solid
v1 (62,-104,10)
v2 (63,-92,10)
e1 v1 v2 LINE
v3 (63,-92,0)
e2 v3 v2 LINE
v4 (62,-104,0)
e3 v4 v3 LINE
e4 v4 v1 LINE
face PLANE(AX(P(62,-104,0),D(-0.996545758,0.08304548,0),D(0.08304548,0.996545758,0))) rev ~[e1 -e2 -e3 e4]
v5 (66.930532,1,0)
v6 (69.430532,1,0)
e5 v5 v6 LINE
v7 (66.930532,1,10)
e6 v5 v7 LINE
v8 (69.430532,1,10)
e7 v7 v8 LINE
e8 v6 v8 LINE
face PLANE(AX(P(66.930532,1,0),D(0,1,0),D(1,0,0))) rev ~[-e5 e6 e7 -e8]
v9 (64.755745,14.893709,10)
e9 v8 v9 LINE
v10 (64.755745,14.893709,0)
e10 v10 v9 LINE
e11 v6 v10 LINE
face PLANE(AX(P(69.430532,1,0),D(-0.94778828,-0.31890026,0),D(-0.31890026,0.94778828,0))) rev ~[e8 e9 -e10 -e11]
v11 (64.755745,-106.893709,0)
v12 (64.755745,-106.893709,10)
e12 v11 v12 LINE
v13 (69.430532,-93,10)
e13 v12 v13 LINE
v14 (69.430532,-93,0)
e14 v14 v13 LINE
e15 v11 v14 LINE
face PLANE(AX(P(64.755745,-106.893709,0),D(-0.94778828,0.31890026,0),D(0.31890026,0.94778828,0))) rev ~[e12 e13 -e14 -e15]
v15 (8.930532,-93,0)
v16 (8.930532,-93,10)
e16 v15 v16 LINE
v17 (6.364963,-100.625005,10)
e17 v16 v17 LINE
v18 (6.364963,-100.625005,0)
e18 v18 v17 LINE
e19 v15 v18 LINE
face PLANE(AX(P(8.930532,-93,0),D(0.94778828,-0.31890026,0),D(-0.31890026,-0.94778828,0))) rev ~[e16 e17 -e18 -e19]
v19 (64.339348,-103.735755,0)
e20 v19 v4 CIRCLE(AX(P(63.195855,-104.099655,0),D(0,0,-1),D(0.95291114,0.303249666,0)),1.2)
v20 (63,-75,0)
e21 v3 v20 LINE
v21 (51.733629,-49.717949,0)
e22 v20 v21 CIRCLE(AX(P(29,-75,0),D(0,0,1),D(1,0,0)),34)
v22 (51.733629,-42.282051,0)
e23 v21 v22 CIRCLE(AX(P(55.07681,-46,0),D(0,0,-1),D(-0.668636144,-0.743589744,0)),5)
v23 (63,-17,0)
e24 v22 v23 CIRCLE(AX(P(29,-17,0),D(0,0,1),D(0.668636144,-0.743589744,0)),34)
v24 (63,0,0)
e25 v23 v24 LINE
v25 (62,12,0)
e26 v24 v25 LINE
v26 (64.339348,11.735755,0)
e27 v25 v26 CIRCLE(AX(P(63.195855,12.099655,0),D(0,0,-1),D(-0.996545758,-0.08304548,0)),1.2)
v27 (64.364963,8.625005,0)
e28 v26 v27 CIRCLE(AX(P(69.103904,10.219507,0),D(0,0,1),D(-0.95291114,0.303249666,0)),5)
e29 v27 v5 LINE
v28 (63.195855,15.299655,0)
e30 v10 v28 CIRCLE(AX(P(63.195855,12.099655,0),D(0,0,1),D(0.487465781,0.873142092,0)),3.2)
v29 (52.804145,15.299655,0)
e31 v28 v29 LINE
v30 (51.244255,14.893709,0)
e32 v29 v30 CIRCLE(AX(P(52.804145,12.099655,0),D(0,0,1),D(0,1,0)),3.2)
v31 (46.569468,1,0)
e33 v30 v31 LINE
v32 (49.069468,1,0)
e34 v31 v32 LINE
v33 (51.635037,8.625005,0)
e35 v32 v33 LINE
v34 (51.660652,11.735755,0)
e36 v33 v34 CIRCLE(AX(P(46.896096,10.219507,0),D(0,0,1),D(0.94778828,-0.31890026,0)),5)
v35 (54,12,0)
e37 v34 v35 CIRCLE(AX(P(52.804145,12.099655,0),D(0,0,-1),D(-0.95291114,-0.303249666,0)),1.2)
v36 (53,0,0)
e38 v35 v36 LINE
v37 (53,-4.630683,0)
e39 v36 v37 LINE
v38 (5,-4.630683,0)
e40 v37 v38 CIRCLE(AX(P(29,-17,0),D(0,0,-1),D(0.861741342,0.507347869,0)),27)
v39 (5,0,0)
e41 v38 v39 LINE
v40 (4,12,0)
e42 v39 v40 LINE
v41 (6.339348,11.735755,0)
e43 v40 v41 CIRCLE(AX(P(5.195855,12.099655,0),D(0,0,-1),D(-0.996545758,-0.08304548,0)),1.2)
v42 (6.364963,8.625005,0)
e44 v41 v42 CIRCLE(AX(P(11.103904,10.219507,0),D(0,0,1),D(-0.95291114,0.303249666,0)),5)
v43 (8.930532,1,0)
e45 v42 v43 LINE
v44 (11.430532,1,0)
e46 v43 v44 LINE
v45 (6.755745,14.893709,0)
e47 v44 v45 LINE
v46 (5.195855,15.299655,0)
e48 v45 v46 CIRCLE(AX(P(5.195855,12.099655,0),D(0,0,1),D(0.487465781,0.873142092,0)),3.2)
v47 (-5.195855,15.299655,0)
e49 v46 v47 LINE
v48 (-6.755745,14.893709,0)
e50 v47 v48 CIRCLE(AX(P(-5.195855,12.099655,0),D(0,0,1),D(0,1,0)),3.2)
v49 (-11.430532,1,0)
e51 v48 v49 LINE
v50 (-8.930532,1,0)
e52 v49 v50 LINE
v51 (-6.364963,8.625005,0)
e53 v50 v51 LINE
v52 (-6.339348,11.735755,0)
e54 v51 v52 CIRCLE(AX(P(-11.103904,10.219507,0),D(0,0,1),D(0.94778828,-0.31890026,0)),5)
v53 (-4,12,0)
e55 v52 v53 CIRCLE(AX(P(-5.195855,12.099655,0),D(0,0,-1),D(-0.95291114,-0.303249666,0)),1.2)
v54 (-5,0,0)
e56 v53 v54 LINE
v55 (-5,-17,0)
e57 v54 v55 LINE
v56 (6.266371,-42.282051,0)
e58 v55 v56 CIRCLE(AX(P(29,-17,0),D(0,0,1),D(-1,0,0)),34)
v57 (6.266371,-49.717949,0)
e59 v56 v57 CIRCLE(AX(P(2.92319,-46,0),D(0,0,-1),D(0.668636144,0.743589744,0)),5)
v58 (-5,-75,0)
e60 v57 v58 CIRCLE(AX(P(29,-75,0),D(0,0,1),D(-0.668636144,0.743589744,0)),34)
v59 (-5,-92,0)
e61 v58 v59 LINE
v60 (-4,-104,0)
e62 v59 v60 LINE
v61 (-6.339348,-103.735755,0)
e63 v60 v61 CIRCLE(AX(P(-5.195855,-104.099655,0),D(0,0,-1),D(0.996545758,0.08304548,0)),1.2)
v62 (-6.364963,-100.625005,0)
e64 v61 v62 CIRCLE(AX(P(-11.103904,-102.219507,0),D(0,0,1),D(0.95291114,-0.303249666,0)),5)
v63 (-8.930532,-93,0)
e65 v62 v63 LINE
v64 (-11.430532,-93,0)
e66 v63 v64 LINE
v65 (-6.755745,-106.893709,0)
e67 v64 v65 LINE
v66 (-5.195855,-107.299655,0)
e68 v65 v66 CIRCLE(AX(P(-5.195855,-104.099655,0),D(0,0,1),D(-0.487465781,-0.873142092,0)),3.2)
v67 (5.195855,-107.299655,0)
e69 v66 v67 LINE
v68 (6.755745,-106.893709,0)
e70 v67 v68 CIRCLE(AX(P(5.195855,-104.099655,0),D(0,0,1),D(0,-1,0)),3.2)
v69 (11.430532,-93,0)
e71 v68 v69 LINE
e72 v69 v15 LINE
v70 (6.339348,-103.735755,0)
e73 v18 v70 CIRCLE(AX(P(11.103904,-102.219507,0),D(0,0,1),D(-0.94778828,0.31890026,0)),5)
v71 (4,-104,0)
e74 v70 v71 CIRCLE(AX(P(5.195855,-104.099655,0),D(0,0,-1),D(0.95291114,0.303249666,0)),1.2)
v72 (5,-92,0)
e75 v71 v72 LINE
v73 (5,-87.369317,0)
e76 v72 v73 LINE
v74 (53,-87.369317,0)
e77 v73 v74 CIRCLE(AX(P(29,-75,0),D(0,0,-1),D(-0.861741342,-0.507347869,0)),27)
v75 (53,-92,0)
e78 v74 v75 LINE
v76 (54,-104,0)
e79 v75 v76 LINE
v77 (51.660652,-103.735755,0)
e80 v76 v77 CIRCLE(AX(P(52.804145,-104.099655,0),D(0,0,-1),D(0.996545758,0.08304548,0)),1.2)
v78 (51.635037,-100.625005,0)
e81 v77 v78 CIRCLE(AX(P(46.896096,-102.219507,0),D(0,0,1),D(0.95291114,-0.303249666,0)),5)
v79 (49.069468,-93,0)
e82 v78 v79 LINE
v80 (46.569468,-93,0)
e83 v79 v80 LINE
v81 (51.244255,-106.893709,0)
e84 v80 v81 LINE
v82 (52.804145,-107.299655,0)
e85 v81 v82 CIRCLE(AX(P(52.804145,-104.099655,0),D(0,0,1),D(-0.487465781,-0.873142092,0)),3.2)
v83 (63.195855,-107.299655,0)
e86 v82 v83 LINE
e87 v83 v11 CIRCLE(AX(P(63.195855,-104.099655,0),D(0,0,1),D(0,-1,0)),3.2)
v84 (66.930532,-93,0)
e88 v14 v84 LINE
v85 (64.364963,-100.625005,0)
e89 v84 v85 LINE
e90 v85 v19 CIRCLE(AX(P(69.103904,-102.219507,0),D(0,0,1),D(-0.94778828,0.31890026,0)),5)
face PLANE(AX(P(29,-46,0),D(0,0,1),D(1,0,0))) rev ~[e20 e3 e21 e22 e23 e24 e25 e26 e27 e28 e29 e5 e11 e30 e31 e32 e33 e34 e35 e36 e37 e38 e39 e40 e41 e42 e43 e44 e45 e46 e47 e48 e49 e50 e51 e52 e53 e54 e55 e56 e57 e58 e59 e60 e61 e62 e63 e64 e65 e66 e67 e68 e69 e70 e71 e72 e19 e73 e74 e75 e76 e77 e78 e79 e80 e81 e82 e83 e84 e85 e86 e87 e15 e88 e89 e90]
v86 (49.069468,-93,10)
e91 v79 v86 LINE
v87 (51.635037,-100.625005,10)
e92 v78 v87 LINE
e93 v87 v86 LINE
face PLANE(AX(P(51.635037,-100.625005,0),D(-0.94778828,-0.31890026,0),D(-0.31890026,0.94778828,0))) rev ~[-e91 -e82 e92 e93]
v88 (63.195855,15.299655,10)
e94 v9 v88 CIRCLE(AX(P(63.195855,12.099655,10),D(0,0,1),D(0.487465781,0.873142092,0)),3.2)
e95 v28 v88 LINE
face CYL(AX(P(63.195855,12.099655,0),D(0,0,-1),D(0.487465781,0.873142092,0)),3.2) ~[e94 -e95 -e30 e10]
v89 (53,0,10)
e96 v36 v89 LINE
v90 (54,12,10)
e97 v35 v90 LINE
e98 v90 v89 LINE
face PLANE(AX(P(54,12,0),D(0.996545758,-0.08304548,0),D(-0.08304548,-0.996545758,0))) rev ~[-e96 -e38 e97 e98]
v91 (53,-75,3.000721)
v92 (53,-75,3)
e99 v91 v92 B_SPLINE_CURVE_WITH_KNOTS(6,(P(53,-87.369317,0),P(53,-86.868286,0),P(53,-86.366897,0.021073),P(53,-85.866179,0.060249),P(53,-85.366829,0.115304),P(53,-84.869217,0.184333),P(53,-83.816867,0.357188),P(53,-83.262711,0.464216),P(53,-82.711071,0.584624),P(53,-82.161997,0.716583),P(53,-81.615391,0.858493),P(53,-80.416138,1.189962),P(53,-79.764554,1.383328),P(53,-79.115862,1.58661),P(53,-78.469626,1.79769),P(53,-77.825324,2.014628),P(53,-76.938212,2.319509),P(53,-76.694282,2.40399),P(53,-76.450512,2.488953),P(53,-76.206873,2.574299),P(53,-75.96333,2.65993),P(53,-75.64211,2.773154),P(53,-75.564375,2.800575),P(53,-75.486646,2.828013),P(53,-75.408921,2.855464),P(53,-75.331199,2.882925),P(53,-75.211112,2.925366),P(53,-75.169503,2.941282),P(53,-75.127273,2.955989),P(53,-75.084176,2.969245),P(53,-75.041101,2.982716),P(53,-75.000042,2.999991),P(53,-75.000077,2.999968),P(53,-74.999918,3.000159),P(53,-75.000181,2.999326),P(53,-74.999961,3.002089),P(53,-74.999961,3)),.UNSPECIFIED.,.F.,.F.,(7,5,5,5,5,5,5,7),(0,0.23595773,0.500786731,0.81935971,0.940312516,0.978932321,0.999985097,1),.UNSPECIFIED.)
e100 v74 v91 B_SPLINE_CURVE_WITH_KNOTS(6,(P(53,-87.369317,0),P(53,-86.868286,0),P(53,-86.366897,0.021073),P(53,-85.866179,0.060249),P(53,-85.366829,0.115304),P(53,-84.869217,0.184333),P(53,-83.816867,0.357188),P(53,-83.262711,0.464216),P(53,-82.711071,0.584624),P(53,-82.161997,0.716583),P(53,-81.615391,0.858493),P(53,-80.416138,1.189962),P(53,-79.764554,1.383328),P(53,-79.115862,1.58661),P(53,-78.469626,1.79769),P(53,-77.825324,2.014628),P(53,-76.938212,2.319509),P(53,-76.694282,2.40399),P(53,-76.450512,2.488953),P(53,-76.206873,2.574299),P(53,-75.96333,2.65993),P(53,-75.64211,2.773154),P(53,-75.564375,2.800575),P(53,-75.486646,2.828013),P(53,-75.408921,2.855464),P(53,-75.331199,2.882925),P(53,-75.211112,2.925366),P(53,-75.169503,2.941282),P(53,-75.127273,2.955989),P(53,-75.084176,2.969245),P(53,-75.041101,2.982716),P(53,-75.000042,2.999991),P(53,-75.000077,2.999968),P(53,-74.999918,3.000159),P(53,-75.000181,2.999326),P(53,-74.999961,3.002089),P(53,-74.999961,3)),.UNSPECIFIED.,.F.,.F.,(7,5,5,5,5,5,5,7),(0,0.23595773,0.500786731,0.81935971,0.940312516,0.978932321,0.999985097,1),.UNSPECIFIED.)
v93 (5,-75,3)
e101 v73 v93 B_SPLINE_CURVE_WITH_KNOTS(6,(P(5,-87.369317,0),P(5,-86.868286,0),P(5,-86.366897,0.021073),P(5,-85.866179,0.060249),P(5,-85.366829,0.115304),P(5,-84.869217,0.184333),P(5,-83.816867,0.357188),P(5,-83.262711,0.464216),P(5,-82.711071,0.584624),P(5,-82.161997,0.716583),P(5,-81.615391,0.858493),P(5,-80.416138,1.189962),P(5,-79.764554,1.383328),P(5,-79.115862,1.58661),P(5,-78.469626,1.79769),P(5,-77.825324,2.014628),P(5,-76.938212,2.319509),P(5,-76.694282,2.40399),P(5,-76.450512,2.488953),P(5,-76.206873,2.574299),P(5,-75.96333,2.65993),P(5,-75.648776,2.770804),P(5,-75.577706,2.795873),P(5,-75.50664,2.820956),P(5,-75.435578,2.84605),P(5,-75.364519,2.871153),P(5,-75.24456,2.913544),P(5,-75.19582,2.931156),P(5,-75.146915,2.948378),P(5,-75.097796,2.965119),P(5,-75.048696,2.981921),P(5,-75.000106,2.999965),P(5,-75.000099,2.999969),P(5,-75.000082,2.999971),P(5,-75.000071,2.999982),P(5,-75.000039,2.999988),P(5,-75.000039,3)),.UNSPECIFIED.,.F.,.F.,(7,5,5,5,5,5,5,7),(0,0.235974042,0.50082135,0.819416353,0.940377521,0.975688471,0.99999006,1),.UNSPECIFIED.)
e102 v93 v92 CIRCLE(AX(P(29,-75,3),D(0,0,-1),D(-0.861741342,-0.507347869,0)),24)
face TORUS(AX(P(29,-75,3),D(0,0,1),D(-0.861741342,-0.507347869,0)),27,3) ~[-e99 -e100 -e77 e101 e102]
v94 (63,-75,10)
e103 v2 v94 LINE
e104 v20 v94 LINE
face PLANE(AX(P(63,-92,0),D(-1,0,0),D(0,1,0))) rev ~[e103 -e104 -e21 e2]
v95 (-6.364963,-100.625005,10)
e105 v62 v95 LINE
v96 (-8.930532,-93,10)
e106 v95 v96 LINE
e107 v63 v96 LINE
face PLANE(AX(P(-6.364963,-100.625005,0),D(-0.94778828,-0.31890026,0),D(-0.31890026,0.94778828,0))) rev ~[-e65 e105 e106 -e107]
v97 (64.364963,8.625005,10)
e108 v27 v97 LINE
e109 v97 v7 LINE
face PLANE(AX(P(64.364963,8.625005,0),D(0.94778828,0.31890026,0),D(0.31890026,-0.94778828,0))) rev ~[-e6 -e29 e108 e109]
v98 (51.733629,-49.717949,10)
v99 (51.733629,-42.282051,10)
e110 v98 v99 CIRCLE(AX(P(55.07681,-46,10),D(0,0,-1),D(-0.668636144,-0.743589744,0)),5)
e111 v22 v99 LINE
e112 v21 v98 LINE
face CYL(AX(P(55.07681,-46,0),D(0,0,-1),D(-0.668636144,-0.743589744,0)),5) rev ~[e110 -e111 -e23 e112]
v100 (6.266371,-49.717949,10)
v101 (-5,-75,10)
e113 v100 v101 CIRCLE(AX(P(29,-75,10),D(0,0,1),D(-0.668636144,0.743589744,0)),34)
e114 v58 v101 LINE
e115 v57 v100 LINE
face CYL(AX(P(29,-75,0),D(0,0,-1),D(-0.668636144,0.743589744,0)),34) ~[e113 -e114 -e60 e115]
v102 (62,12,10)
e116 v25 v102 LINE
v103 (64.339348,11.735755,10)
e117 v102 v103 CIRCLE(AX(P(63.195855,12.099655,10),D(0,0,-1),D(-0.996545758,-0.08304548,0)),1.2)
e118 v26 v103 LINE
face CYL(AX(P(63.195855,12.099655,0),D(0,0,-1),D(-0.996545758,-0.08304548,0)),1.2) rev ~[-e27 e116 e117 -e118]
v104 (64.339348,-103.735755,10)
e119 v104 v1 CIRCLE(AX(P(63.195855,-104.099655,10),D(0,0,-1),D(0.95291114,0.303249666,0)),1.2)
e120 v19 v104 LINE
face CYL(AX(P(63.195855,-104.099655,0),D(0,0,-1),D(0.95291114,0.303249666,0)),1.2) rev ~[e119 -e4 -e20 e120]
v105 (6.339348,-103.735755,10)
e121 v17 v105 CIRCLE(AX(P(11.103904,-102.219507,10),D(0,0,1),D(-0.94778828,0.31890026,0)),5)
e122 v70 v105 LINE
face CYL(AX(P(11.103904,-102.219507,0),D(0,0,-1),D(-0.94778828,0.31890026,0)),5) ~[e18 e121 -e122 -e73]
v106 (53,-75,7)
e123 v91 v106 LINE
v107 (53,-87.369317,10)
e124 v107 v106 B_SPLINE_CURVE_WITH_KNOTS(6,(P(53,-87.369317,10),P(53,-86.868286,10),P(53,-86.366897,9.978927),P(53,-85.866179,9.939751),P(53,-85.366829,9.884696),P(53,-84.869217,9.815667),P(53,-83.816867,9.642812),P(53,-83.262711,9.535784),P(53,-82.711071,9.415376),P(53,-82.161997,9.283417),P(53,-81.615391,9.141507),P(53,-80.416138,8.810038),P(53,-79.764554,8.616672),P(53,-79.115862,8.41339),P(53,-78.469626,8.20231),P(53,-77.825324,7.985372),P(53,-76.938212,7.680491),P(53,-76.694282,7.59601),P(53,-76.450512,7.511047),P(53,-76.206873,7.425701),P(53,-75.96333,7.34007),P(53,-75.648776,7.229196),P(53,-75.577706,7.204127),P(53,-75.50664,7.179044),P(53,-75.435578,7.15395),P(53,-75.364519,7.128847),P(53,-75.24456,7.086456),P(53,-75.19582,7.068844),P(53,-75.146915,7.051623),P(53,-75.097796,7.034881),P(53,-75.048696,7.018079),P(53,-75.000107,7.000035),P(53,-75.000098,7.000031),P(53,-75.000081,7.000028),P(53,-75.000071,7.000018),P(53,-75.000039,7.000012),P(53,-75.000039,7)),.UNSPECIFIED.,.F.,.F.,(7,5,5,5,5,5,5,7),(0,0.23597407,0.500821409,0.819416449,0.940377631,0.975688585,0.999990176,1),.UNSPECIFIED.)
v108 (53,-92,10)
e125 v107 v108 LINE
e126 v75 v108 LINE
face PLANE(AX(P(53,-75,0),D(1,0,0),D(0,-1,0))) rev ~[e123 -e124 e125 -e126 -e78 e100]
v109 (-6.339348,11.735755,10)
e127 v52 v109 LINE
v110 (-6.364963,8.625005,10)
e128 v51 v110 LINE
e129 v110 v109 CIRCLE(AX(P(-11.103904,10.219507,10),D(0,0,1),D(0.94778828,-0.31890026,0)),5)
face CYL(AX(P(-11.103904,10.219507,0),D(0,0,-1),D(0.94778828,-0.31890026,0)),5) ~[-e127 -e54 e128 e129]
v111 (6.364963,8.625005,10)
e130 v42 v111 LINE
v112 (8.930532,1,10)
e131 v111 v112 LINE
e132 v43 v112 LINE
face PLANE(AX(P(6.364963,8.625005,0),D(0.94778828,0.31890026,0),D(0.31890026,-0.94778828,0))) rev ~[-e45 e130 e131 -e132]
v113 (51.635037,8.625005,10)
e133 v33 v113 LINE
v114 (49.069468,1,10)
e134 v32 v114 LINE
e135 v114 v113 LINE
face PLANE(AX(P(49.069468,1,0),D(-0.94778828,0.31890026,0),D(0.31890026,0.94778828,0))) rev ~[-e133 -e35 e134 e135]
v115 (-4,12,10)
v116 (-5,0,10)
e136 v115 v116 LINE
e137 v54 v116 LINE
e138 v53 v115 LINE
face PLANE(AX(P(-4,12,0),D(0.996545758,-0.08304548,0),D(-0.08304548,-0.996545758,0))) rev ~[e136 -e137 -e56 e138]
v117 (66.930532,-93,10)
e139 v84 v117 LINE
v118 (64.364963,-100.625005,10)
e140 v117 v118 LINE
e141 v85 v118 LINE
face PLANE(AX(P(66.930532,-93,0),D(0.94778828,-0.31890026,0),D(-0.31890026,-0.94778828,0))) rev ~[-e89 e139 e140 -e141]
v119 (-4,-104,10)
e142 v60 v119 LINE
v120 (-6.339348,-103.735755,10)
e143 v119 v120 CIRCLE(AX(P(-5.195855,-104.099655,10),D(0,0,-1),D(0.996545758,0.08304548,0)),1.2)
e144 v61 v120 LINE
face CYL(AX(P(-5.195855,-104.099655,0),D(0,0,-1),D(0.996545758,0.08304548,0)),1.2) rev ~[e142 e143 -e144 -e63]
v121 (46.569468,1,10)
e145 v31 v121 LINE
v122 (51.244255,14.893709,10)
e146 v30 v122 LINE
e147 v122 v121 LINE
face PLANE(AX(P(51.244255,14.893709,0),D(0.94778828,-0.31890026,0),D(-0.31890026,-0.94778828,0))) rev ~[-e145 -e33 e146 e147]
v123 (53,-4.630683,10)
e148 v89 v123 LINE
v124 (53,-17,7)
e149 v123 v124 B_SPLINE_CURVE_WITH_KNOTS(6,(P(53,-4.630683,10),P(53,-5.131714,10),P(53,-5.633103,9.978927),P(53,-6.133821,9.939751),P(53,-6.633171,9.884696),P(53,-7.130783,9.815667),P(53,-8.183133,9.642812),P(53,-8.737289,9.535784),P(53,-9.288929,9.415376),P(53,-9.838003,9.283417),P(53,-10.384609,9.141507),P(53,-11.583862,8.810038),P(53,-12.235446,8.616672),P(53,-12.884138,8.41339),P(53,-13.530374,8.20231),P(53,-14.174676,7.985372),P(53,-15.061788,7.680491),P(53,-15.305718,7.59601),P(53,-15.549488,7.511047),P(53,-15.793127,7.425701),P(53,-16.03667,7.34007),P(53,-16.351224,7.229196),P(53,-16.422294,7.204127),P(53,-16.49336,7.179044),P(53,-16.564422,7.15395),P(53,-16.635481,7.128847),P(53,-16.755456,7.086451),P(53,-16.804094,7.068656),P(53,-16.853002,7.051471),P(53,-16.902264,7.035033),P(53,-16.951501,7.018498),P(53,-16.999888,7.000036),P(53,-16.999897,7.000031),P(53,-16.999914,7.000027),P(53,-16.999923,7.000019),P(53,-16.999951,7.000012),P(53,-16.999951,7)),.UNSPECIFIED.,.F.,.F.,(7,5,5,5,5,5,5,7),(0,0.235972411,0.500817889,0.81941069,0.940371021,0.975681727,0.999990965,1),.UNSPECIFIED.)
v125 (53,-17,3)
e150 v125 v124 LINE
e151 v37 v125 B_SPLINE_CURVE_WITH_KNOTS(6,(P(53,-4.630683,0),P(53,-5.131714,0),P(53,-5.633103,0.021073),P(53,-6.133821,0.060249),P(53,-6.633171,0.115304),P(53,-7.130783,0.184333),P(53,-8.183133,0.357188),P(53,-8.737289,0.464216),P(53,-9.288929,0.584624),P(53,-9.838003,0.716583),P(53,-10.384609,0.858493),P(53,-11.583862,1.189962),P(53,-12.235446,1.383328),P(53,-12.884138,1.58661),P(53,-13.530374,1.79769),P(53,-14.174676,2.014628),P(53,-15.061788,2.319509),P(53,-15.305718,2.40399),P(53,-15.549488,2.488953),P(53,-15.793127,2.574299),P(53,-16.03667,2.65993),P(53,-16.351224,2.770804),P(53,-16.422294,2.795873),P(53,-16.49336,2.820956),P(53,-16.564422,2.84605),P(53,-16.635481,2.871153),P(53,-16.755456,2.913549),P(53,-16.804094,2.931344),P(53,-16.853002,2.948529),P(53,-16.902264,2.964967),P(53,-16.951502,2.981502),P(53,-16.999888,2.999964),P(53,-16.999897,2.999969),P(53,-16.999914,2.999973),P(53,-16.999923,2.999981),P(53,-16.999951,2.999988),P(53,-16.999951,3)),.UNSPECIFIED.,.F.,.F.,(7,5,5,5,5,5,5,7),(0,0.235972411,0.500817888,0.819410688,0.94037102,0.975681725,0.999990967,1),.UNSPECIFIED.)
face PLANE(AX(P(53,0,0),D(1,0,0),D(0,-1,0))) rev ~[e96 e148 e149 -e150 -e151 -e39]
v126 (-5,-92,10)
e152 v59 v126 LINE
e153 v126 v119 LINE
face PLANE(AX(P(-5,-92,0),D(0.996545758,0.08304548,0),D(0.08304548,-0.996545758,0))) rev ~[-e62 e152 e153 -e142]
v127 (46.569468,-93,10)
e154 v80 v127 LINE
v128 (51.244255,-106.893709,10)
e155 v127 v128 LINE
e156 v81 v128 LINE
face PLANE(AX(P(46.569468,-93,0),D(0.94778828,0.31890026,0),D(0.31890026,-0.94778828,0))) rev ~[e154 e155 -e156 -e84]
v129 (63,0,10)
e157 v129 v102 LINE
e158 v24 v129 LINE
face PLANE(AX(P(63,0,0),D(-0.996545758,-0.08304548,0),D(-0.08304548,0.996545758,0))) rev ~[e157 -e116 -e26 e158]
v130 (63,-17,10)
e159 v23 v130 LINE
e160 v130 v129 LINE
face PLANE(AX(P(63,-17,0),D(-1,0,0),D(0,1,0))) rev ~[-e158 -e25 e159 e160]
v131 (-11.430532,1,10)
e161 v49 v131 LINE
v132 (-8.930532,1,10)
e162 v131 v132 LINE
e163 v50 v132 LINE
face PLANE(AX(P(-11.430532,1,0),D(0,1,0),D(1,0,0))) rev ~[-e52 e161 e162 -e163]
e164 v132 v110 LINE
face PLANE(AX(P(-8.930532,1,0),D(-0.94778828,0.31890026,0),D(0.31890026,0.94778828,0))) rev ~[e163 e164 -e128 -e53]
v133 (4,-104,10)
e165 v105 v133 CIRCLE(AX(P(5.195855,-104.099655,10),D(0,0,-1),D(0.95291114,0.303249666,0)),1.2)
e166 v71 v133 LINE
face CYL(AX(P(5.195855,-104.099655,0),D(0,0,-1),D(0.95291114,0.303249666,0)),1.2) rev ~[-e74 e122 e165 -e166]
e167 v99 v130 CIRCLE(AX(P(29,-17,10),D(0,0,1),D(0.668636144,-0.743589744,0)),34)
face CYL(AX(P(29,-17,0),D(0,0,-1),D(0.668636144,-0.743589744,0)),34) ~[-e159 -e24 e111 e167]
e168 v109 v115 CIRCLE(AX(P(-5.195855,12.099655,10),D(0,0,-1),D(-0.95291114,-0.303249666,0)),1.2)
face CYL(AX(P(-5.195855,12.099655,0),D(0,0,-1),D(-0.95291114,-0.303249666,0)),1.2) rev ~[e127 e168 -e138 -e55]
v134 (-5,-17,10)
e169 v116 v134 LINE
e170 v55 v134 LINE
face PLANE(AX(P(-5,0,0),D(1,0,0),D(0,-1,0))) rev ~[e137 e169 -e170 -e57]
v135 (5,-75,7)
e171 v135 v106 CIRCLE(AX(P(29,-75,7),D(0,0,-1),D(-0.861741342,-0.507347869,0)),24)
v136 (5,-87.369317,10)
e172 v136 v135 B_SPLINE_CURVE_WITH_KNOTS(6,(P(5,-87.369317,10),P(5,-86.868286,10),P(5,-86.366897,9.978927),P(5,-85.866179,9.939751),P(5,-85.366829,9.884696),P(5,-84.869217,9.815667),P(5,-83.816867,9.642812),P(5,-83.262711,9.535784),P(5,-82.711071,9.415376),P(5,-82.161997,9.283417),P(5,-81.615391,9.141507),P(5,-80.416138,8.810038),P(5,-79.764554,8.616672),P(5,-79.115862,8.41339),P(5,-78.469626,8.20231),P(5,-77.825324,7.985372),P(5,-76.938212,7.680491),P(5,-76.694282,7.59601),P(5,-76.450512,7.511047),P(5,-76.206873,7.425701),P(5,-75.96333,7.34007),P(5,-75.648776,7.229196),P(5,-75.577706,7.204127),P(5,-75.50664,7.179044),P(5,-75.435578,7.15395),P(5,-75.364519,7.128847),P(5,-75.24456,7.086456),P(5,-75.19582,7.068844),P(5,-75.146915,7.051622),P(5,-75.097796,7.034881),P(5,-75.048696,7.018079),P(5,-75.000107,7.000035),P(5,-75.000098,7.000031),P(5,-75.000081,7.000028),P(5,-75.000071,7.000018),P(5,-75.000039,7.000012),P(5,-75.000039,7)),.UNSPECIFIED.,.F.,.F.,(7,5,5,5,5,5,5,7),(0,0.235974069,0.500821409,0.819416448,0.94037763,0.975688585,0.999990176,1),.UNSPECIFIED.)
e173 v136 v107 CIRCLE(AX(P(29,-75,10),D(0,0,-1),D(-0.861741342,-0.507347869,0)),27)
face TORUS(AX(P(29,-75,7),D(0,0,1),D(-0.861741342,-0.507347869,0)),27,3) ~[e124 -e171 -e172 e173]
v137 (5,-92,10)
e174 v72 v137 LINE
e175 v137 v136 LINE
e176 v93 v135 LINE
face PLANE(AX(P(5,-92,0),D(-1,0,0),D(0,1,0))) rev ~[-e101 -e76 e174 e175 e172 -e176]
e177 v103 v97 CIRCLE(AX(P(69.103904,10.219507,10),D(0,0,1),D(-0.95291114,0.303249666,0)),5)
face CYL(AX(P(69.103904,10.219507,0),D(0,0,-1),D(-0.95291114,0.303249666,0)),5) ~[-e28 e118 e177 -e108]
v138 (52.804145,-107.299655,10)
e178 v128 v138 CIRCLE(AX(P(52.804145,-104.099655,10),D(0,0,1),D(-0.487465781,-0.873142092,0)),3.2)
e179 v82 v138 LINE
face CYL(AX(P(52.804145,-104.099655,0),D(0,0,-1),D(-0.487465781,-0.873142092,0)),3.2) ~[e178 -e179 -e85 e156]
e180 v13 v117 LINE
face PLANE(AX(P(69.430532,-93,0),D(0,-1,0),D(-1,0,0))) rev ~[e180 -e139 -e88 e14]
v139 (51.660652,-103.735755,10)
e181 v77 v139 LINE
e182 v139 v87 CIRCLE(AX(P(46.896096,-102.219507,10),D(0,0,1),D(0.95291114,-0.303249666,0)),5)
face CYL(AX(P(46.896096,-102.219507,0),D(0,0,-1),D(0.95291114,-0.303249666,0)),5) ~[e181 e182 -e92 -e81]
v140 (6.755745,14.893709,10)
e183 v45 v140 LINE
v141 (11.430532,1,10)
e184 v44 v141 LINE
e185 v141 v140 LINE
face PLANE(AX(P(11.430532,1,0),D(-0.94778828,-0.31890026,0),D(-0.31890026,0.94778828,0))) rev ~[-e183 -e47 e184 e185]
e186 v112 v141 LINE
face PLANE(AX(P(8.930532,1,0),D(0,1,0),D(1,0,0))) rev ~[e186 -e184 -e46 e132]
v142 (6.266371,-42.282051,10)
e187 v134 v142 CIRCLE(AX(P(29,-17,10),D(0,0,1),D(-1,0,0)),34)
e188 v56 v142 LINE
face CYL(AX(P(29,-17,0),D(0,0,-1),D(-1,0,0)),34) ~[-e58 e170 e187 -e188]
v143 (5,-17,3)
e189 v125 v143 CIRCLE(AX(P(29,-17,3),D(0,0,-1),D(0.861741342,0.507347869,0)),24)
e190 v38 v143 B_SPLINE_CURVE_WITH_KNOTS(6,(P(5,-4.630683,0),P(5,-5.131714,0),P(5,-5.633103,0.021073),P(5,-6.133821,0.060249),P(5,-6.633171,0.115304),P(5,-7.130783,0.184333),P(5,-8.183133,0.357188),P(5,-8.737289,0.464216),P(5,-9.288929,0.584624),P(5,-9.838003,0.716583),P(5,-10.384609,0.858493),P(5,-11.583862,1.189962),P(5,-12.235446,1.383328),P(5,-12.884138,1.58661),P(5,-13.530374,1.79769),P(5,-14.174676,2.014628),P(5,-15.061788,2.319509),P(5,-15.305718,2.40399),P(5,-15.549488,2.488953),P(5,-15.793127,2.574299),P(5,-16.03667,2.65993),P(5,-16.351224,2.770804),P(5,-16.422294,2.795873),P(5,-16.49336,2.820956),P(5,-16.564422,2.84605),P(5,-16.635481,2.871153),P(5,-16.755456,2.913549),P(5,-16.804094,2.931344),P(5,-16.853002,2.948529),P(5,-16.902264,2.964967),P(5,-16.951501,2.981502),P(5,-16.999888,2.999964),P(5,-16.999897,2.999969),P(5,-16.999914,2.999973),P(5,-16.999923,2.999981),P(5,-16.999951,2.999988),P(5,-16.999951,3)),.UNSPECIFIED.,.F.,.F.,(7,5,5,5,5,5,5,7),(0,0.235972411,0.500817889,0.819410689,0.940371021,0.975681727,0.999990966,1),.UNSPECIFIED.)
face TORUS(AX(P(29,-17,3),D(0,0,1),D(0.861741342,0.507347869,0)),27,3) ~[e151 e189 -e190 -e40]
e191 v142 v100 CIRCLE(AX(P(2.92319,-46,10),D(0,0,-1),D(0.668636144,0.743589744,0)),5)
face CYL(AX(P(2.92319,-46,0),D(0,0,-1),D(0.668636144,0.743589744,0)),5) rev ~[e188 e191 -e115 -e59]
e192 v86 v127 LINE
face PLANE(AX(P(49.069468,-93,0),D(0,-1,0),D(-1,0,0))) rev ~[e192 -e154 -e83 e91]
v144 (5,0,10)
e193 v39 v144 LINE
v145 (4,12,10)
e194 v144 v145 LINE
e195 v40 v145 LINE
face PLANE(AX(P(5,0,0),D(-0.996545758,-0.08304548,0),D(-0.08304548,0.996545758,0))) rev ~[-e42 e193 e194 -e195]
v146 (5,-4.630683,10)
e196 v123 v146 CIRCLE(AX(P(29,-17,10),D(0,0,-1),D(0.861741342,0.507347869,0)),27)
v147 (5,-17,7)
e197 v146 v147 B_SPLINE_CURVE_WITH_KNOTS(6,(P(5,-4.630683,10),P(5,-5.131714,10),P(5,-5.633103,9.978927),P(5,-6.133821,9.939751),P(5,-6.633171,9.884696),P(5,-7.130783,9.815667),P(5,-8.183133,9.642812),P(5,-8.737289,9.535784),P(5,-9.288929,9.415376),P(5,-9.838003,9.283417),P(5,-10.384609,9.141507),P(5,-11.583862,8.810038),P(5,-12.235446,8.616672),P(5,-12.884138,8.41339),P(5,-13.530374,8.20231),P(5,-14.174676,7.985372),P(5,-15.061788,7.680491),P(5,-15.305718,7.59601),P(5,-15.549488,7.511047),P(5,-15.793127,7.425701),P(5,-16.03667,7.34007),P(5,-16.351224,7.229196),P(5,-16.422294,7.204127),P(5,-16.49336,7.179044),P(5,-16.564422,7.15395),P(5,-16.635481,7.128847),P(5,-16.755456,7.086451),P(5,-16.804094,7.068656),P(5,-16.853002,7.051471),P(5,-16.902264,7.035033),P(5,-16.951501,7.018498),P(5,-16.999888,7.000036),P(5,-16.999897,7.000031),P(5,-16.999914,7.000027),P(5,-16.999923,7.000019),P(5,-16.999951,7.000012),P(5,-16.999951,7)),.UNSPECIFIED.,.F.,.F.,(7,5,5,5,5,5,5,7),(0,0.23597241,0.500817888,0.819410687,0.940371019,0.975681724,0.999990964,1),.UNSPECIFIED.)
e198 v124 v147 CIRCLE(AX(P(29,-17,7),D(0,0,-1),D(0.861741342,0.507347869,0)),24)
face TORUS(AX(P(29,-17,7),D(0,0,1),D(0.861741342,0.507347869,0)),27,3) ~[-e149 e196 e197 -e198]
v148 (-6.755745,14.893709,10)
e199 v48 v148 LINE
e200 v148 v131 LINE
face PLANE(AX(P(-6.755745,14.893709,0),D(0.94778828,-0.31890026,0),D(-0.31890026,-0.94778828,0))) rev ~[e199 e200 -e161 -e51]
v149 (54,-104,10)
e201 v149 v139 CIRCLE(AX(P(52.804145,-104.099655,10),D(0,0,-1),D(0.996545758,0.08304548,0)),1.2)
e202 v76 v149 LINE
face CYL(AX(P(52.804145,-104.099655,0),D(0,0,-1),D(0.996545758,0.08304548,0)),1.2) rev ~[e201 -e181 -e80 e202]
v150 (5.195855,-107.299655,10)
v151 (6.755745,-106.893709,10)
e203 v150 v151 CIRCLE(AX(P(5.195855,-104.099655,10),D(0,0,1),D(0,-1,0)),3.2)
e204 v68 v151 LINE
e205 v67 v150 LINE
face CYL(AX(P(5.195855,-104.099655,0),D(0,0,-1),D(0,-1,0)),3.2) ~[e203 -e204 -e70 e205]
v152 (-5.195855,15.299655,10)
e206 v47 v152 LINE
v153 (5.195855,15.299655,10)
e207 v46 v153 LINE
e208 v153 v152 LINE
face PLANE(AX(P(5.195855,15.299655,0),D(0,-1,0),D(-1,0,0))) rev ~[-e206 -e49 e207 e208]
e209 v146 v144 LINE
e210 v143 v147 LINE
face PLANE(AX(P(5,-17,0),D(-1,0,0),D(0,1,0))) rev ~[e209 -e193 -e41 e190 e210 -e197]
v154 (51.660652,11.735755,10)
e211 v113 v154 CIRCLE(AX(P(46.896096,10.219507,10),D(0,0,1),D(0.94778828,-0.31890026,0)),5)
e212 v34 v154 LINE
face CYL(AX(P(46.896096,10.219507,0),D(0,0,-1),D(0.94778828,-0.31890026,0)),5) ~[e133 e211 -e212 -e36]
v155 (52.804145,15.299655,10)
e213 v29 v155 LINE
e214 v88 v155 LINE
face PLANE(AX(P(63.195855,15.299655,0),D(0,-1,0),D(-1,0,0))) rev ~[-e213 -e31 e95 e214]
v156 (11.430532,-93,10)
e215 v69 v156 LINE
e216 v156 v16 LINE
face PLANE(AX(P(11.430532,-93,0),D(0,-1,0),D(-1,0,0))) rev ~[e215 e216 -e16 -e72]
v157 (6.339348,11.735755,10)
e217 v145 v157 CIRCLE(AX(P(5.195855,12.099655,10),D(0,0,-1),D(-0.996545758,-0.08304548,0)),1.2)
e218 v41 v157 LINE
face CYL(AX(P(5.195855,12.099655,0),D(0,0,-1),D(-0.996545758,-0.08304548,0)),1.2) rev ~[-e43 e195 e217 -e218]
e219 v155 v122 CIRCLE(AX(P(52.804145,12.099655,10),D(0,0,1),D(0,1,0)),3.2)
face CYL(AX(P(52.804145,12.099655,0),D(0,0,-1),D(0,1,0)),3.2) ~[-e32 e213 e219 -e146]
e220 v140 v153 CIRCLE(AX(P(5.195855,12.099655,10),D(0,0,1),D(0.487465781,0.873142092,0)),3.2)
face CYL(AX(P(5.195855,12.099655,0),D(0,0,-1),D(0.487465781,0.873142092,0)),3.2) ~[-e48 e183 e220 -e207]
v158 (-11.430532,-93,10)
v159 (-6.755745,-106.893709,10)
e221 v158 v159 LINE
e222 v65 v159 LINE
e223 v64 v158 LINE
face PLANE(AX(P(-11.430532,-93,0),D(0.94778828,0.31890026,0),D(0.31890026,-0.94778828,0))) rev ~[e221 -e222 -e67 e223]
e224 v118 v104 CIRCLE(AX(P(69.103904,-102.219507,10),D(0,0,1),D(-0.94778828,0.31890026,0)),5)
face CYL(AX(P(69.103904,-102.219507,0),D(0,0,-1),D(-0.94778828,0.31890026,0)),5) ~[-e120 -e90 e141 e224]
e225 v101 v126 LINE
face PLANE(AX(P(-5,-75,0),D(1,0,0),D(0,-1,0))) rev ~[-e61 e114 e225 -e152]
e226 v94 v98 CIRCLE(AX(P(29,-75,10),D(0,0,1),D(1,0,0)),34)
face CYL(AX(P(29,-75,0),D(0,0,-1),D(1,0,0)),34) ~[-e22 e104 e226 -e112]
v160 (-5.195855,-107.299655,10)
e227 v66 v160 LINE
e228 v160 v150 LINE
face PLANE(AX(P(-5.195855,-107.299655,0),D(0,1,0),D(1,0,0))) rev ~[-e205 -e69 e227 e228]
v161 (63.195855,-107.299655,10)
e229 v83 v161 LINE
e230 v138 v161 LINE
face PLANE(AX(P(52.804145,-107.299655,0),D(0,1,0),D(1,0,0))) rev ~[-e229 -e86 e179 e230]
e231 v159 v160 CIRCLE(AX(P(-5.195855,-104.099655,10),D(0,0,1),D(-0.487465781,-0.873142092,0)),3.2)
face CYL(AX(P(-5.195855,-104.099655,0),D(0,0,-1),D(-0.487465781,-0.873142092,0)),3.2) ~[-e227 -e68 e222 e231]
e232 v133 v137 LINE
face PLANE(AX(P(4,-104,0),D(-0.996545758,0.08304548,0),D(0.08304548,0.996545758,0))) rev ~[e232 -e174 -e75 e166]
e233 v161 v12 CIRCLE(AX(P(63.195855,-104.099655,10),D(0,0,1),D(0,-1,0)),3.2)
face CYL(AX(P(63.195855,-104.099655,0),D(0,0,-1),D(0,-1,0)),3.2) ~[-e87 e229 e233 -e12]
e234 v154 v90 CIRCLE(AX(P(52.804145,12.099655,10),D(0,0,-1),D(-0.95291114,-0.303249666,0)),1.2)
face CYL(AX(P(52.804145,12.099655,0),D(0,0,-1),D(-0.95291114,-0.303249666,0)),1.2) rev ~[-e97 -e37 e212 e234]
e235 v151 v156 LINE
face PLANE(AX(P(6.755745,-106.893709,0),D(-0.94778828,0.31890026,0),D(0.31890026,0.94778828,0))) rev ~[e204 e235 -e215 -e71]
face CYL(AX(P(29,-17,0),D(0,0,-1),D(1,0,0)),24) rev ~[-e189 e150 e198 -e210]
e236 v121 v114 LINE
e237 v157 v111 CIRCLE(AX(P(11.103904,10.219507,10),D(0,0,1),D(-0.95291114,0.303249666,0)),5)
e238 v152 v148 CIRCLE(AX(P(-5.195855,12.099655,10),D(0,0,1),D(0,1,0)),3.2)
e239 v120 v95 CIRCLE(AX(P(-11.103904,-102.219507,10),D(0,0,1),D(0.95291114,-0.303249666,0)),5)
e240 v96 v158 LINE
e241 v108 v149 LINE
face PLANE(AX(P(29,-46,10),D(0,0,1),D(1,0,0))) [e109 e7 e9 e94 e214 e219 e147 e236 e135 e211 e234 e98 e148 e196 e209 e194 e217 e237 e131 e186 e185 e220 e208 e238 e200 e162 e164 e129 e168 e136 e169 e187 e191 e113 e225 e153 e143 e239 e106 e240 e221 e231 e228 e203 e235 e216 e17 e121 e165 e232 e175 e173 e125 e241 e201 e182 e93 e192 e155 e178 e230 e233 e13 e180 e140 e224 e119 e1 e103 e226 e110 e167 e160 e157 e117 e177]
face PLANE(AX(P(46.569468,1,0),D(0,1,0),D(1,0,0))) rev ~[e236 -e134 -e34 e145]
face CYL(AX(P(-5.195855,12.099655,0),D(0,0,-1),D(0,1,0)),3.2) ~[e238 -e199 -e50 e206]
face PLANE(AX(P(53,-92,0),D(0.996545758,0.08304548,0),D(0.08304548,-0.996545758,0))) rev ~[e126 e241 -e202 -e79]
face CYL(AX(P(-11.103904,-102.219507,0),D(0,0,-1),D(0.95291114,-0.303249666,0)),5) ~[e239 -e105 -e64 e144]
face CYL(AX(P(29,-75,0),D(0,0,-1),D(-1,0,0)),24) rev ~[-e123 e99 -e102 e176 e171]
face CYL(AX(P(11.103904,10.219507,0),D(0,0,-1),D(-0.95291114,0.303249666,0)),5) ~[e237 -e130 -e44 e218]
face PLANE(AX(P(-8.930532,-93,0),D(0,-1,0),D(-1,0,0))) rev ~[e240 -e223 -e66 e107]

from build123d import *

# Parameters (mm, degrees)
F1_DEPTH    = 10
F2_T2_ANGLE = 240.9746670828
F2_T4_ANGLE = 240.9746670828
F2_T6_ANGLE = 240.9746670828
F2_T8_ANGLE = 240.9746670828


# Not quite as in the source:
# - a fillet or chamfer that OpenCascade refuses, or shapes differently, is made with other operations: its cross-section is extruded or revolved along the edge and cut away or added


with BuildPart() as f1:
    # F0 (on Top) → F1 (new body)
    with BuildSketch(Plane.XY):
        with BuildLine():
            ThreePointArc((6.3393482774, 11.7357549763), (6.1040734685, 10.1783374237), (6.3649625736, 8.6250053459))
            Line((6.3649625736, 8.6250053459), (8.9305315263, 1))
            Line((8.9305315263, 1), (11.4305315263, 1))
            Line((11.4305315263, 1), (6.7557454084, 14.8937092698))
            ThreePointArc((6.7557454084, 14.8937092698), (6.001778287, 15.1965058009), (5.1958549099, 15.2996545758))
            Line((5.1958549099, 15.2996545758), (0, 15.2996545758))
            Line((0, 15.2996545758), (-5.1958549099, 15.2996545758))
            ThreePointArc((-5.1958549099, 15.2996545758), (-6.001778287, 15.1965058009), (-6.7557454084, 14.8937092698))
            Line((-6.7557454084, 14.8937092698), (-11.4305315263, 1))
            Line((-11.4305315263, 1), (-8.9305315263, 1))
            Line((-8.9305315263, 1), (-6.3649625736, 8.6250053459))
            ThreePointArc((-6.3649625736, 8.6250053459), (-6.1040734685, 10.1783374237), (-6.3393482774, 11.7357549763))
            ThreePointArc((-6.3393482774, 11.7357549763), (-5.3305463755, 13.2920715369), (-4, 12))
            Line((-4, 12), (-5, 0))
            Line((-5, 0), (-5, -17))
            ThreePointArc((-5, -17), (-2.0559445405, -30.8393753001), (6.2663710998, -42.2820512821))
            ThreePointArc((6.2663710998, -42.2820512821), (7.9231903792, -46), (6.2663710998, -49.7179487179))
            ThreePointArc((6.2663710998, -49.7179487179), (-2.0559445405, -61.1606246999), (-5, -75))
            Line((-5, -75), (-5, -92))
            Line((-5, -92), (-4, -104))
            ThreePointArc((-4, -104), (-5.3305463755, -105.2920715369), (-6.3393482774, -103.7357549763))
            ThreePointArc((-6.3393482774, -103.7357549763), (-6.1040734685, -102.1783374237), (-6.3649625736, -100.6250053459))
            Line((-6.3649625736, -100.6250053459), (-8.9305315263, -93))
            Line((-8.9305315263, -93), (-11.4305315263, -93))
            Line((-11.4305315263, -93), (-6.7557454084, -106.8937092698))
            ThreePointArc((-6.7557454084, -106.8937092698), (-6.001778287, -107.1965058009), (-5.1958549099, -107.2996545758))
            Line((-5.1958549099, -107.2996545758), (0, -107.2996545758))
            Line((0, -107.2996545758), (5.1958549099, -107.2996545758))
            ThreePointArc((5.1958549099, -107.2996545758), (6.001778287, -107.1965058009), (6.7557454084, -106.8937092698))
            Line((6.7557454084, -106.8937092698), (11.4305315263, -93))
            Line((11.4305315263, -93), (8.9305315263, -93))
            Line((8.9305315263, -93), (6.3649625736, -100.6250053459))
            ThreePointArc((6.3649625736, -100.6250053459), (6.1040734685, -102.1783374237), (6.3393482774, -103.7357549763))
            ThreePointArc((6.3393482774, -103.7357549763), (5.3305463755, -105.2920715369), (4, -104))
            Line((4, -104), (5, -92))
            Line((5, -92), (5, -75))
            ThreePointArc((5, -75), (29, -51), (53, -75))
            Line((53, -75), (53, -92))
            Line((53, -92), (54, -104))
            ThreePointArc((54, -104), (52.6694536245, -105.2920715369), (51.6606517226, -103.7357549763))
            ThreePointArc((51.6606517226, -103.7357549763), (51.8959265315, -102.1783374237), (51.6350374264, -100.6250053459))
            Line((51.6350374264, -100.6250053459), (49.0694684737, -93))
            Line((49.0694684737, -93), (46.5694684737, -93))
            Line((46.5694684737, -93), (51.2442545916, -106.8937092698))
            ThreePointArc((51.2442545916, -106.8937092698), (51.998221713, -107.1965058009), (52.8041450901, -107.2996545758))
            Line((52.8041450901, -107.2996545758), (58, -107.2996545758))
            Line((58, -107.2996545758), (63.1958549099, -107.2996545758))
            ThreePointArc((63.1958549099, -107.2996545758), (64.001778287, -107.1965058009), (64.7557454084, -106.8937092698))
            Line((64.7557454084, -106.8937092698), (69.4305315263, -93))
            Line((69.4305315263, -93), (66.9305315263, -93))
            Line((66.9305315263, -93), (64.3649625736, -100.6250053459))
            ThreePointArc((64.3649625736, -100.6250053459), (64.1040734685, -102.1783374237), (64.3393482774, -103.7357549763))
            ThreePointArc((64.3393482774, -103.7357549763), (63.3305463755, -105.2920715369), (62, -104))
            Line((62, -104), (63, -92))
            Line((63, -92), (63, -75))
            ThreePointArc((63, -75), (60.0559445405, -61.1606246999), (51.7336289002, -49.7179487179))
            ThreePointArc((51.7336289002, -49.7179487179), (50.0768096208, -46), (51.7336289002, -42.2820512821))
            ThreePointArc((51.7336289002, -42.2820512821), (60.0559445405, -30.8393753001), (63, -17))
            Line((63, -17), (63, 0))
            Line((63, 0), (62, 12))
            ThreePointArc((62, 12), (63.3305463755, 13.2920715369), (64.3393482774, 11.7357549763))
            ThreePointArc((64.3393482774, 11.7357549763), (64.1040734685, 10.1783374237), (64.3649625736, 8.6250053459))
            Line((64.3649625736, 8.6250053459), (66.9305315263, 1))
            Line((66.9305315263, 1), (69.4305315263, 1))
            Line((69.4305315263, 1), (64.7557454084, 14.8937092698))
            ThreePointArc((64.7557454084, 14.8937092698), (64.001778287, 15.1965058009), (63.1958549099, 15.2996545758))
            Line((63.1958549099, 15.2996545758), (58, 15.2996545758))
            Line((58, 15.2996545758), (52.8041450901, 15.2996545758))
            ThreePointArc((52.8041450901, 15.2996545758), (51.998221713, 15.1965058009), (51.2442545916, 14.8937092698))
            Line((51.2442545916, 14.8937092698), (46.5694684737, 1))
            Line((46.5694684737, 1), (49.0694684737, 1))
            Line((49.0694684737, 1), (51.6350374264, 8.6250053459))
            ThreePointArc((51.6350374264, 8.6250053459), (51.8959265315, 10.1783374237), (51.6606517226, 11.7357549763))
            ThreePointArc((51.6606517226, 11.7357549763), (52.6694536245, 13.2920715369), (54, 12))
            Line((54, 12), (53, 0))
            Line((53, 0), (53, -17))
            ThreePointArc((53, -17), (29, -41), (5, -17))
            Line((5, -17), (5, 0))
            Line((5, 0), (4, 12))
            ThreePointArc((4, 12), (5.3305463755, 13.2920715369), (6.3393482774, 11.7357549763))
        make_face()
    extrude(amount=F1_DEPTH)

    # F2: fillet of radius 3 on 4 edges, made by hand

    # F2_s1 → F2_t2 (revolve, cut)
    with BuildSketch(Plane(origin=(14.8970987107, -25.3030447424, 0), x_dir=(0, 0, 1), z_dir=(-0.507347869, 0.8617413416, 0))):
        with BuildLine():
            ThreePointArc((10, 43.3655851338), (9.1213203436, 41.2442647902), (7, 40.3655851338))
            Line((7, 40.3655851338), (10, 40.3655851338))
            Line((10, 40.3655851338), (10, 43.3655851338))
        make_face()
    revolve(axis=Axis((29, -17, 10), (0, 0, -1)), revolution_arc=F2_T2_ANGLE, mode=Mode.SUBTRACT)

    # F2_s3 → F2_t4 (revolve, cut)
    with BuildSketch(Plane(origin=(14.8970987107, -25.3030447424, 0), x_dir=(0, 0, 1), z_dir=(-0.507347869, 0.8617413416, 0))):
        with BuildLine():
            ThreePointArc((3, 40.3655851338), (0.8786796564, 41.2442647902), (0, 43.3655851338))
            Line((0, 43.3655851338), (0, 40.3655851338))
            Line((0, 40.3655851338), (3, 40.3655851338))
        make_face()
    revolve(axis=Axis((29, -17, 0), (0, 0, -1)), revolution_arc=F2_T4_ANGLE, mode=Mode.SUBTRACT)

    # F2_s5 → F2_t6 (revolve, cut)
    with BuildSketch(Plane(origin=(40.2548514411, -68.3737368527, 0), x_dir=(0, 0, 1), z_dir=(0.507347869, -0.8617413416, 0))):
        with BuildLine():
            ThreePointArc((10, 40.0605912676), (9.1213203436, 37.939270924), (7, 37.0605912676))
            Line((7, 37.0605912676), (10, 37.0605912676))
            Line((10, 37.0605912676), (10, 40.0605912676))
        make_face()
    revolve(axis=Axis((29, -75, 10), (0, 0, -1)), revolution_arc=F2_T6_ANGLE, mode=Mode.SUBTRACT)

    # F2_s7 → F2_t8 (revolve, cut)
    with BuildSketch(Plane(origin=(40.2548514411, -68.3737368527, 0), x_dir=(0, 0, 1), z_dir=(0.507347869, -0.8617413416, 0))):
        with BuildLine():
            ThreePointArc((3, 37.0605912676), (0.8786796564, 37.939270924), (0, 40.0605912676))
            Line((0, 40.0605912676), (0, 37.0605912676))
            Line((0, 37.0605912676), (3, 37.0605912676))
        make_face()
    revolve(axis=Axis((29, -75, 0), (0, 0, -1)), revolution_arc=F2_T8_ANGLE, mode=Mode.SUBTRACT)


solid = f1.part
